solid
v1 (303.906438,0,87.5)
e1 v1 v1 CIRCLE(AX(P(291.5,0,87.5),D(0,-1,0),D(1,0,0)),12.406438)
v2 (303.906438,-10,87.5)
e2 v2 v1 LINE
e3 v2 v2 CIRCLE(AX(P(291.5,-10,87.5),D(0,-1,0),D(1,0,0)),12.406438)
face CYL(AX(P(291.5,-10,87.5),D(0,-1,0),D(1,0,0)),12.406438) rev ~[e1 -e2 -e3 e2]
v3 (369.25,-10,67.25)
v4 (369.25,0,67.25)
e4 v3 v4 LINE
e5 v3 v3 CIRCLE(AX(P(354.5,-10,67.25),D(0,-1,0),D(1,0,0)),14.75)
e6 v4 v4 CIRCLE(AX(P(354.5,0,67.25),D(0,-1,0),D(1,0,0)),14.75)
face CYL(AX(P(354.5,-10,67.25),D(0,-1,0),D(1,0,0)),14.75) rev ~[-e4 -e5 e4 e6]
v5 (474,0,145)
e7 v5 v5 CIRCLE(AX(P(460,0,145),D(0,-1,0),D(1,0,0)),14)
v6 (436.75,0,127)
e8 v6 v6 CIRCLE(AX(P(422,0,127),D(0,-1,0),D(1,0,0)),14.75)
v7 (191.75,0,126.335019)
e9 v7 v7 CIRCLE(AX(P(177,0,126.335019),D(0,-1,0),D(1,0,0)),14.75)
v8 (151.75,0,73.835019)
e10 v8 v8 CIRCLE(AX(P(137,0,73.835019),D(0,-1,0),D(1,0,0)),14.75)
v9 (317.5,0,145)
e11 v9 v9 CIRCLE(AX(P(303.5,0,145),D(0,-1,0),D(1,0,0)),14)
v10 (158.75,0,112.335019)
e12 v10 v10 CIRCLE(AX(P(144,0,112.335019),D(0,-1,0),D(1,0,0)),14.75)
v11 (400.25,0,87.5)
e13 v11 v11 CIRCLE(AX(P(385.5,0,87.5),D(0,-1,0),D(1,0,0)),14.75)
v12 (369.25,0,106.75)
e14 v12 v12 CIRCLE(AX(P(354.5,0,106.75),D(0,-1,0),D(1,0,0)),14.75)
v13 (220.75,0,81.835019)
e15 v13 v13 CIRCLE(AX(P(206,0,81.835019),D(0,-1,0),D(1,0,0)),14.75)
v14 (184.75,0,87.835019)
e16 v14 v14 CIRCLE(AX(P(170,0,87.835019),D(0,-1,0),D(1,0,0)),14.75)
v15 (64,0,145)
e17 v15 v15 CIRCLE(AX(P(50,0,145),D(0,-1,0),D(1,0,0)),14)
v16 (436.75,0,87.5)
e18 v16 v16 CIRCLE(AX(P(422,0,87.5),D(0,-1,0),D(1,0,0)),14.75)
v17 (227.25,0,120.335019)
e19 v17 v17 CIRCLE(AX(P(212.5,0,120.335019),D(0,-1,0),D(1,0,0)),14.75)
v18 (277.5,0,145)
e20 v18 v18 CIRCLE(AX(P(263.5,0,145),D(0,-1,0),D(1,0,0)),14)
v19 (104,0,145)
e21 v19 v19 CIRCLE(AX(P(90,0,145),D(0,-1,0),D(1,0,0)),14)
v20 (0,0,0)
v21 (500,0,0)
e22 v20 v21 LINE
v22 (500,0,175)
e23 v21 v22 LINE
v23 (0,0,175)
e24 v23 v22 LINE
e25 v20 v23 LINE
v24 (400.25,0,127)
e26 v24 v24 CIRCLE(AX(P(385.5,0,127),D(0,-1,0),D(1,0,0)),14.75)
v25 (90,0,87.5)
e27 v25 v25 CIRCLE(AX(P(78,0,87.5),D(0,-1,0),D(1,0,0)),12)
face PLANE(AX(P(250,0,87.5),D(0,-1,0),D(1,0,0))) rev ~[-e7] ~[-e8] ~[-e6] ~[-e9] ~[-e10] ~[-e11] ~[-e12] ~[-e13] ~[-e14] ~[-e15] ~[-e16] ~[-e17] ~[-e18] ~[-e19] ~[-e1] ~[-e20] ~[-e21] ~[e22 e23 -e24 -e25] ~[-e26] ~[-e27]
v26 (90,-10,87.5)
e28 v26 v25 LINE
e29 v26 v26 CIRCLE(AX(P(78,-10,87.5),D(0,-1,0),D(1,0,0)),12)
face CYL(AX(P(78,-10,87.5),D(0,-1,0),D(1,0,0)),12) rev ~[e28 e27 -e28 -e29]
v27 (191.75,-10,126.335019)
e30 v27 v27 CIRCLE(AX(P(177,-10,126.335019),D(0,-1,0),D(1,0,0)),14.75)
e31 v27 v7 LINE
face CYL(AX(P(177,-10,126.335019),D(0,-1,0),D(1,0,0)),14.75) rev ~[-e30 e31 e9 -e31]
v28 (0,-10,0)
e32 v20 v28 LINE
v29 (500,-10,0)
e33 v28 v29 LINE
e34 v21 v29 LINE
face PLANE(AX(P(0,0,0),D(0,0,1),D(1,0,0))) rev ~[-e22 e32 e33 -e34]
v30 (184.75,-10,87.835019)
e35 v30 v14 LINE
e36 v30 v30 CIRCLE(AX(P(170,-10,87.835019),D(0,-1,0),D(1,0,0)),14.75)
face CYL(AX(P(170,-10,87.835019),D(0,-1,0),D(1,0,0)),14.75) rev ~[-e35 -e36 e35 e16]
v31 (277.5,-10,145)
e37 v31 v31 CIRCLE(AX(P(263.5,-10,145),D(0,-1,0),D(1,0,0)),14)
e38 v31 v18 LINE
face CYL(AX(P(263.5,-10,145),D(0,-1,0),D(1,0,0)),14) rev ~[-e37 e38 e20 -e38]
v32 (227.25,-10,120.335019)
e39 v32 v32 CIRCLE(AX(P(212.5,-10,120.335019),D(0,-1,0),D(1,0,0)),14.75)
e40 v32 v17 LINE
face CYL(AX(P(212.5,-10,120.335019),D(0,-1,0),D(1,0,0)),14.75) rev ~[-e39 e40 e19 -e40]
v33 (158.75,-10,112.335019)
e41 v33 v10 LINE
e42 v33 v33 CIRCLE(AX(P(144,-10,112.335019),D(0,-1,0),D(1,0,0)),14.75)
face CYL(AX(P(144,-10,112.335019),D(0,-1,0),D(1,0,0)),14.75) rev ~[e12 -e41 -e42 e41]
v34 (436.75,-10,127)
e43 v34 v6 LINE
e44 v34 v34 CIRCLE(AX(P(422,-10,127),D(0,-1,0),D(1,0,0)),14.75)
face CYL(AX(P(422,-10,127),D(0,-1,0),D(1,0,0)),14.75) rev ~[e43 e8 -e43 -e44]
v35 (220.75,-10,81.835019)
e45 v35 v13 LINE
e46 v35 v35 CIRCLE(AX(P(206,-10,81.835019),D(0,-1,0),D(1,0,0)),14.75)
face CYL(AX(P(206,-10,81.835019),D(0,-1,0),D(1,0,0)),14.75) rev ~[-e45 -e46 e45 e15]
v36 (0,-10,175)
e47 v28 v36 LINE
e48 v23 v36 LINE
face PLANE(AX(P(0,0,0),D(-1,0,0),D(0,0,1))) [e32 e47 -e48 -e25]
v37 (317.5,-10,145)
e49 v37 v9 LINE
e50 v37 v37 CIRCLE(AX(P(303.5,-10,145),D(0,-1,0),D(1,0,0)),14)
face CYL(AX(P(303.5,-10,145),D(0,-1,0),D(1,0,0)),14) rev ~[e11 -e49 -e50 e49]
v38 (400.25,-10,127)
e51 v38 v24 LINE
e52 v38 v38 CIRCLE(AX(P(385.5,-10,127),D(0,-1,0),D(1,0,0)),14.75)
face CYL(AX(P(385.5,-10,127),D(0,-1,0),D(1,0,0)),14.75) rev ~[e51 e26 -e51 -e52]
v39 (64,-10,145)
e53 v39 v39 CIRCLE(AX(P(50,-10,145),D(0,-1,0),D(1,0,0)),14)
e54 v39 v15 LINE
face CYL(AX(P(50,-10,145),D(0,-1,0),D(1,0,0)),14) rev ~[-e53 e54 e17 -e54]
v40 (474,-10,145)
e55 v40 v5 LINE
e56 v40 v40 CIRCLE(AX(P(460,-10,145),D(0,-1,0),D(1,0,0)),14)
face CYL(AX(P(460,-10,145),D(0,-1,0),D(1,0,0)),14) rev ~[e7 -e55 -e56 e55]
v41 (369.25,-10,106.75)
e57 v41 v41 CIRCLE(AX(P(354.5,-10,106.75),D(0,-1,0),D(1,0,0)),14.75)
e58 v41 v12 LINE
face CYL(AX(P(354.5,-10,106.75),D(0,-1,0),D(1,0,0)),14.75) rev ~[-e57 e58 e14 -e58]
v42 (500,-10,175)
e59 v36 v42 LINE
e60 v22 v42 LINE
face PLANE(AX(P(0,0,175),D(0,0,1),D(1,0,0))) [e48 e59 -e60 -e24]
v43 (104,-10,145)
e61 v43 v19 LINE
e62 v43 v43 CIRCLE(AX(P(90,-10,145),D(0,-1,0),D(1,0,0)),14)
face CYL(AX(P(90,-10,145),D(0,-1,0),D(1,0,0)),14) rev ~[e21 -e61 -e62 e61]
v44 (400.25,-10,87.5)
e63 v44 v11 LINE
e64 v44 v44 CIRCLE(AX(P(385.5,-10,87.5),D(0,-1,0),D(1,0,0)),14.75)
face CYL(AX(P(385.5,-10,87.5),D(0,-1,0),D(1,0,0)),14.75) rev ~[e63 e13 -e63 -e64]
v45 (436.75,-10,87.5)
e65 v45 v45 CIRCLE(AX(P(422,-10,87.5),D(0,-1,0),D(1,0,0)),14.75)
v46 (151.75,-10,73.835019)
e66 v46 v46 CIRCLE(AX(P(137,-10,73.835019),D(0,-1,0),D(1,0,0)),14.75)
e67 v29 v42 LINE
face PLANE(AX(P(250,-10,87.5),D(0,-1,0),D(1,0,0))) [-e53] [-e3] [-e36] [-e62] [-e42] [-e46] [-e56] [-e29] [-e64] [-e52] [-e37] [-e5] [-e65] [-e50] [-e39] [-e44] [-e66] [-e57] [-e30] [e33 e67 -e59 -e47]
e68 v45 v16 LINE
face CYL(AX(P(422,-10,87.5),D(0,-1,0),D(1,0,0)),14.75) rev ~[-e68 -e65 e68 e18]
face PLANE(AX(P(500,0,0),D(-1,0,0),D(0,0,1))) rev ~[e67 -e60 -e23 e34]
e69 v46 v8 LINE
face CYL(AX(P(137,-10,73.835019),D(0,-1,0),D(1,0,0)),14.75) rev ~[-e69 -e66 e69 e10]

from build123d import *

# Parameters (mm, degrees)
F0_W     = 500
F0_H     = 175
F1_DEPTH = 10
F5_R     = 14.75
F5_R_2   = 12.4064380464
F7_DEPTH = 25
F3_R     = 14.75
F3_R_2   = 12
F8_DEPTH = 25
F6_R     = 14
F9_DEPTH = 25


# Not quite as in the source:
# - a feature names something its author has since deleted; it is built from what else it names


with BuildPart() as f1:
    # F0 (on Front) → F1 (new body)
    with BuildSketch(Plane.XZ):
        with Locations((250, 87.5)):
            Rectangle(F0_W, F0_H)
    extrude(amount=F1_DEPTH)

    # F5 (on face) → F7 (cut)
    with BuildSketch(Plane.XZ.offset(10)):
        with Locations((354.5, 106.75)):
            Circle(F5_R)
        with Locations((385.5, 127)):
            Circle(F5_R)
        with Locations((422, 127)):
            Circle(F5_R)
        with Locations((422, 87.5)):
            Circle(F5_R)
        with Locations((385.5, 87.5)):
            Circle(F5_R)
        with Locations((354.5, 67.25)):
            Circle(F5_R)
        with Locations((291.5, 87.5)):
            Circle(F5_R_2)
    extrude(amount=-F7_DEPTH, mode=Mode.SUBTRACT)

    # F3 (on face) → F8 (cut)
    with BuildSketch(Plane.XZ.offset(10)):
        with Locations((177, 126.3350188136)):
            Circle(F3_R)
        with Locations((212.5, 120.3350188136)):
            Circle(F3_R)
        with Locations((206, 81.8350188136)):
            Circle(F3_R)
        with Locations((170, 87.8350188136)):
            Circle(F3_R)
        with Locations((137, 73.8350188136)):
            Circle(F3_R)
        with Locations((144, 112.3350188136)):
            Circle(F3_R)
        with Locations((78, 87.5)):
            Circle(F3_R_2)
    extrude(amount=-F8_DEPTH, mode=Mode.SUBTRACT)

    # F6 (on face) → F9 (cut)
    with BuildSketch(Plane.XZ.offset(10)):
        with Locations((263.5, 145)):
            Circle(F6_R)
        with Locations((50, 145)):
            Circle(F6_R)
        with Locations((90, 145)):
            Circle(F6_R)
        with Locations((303.5, 145)):
            Circle(F6_R)
        with Locations((460, 145)):
            Circle(F6_R)
    extrude(amount=-F9_DEPTH, mode=Mode.SUBTRACT)


solid = f1.part
